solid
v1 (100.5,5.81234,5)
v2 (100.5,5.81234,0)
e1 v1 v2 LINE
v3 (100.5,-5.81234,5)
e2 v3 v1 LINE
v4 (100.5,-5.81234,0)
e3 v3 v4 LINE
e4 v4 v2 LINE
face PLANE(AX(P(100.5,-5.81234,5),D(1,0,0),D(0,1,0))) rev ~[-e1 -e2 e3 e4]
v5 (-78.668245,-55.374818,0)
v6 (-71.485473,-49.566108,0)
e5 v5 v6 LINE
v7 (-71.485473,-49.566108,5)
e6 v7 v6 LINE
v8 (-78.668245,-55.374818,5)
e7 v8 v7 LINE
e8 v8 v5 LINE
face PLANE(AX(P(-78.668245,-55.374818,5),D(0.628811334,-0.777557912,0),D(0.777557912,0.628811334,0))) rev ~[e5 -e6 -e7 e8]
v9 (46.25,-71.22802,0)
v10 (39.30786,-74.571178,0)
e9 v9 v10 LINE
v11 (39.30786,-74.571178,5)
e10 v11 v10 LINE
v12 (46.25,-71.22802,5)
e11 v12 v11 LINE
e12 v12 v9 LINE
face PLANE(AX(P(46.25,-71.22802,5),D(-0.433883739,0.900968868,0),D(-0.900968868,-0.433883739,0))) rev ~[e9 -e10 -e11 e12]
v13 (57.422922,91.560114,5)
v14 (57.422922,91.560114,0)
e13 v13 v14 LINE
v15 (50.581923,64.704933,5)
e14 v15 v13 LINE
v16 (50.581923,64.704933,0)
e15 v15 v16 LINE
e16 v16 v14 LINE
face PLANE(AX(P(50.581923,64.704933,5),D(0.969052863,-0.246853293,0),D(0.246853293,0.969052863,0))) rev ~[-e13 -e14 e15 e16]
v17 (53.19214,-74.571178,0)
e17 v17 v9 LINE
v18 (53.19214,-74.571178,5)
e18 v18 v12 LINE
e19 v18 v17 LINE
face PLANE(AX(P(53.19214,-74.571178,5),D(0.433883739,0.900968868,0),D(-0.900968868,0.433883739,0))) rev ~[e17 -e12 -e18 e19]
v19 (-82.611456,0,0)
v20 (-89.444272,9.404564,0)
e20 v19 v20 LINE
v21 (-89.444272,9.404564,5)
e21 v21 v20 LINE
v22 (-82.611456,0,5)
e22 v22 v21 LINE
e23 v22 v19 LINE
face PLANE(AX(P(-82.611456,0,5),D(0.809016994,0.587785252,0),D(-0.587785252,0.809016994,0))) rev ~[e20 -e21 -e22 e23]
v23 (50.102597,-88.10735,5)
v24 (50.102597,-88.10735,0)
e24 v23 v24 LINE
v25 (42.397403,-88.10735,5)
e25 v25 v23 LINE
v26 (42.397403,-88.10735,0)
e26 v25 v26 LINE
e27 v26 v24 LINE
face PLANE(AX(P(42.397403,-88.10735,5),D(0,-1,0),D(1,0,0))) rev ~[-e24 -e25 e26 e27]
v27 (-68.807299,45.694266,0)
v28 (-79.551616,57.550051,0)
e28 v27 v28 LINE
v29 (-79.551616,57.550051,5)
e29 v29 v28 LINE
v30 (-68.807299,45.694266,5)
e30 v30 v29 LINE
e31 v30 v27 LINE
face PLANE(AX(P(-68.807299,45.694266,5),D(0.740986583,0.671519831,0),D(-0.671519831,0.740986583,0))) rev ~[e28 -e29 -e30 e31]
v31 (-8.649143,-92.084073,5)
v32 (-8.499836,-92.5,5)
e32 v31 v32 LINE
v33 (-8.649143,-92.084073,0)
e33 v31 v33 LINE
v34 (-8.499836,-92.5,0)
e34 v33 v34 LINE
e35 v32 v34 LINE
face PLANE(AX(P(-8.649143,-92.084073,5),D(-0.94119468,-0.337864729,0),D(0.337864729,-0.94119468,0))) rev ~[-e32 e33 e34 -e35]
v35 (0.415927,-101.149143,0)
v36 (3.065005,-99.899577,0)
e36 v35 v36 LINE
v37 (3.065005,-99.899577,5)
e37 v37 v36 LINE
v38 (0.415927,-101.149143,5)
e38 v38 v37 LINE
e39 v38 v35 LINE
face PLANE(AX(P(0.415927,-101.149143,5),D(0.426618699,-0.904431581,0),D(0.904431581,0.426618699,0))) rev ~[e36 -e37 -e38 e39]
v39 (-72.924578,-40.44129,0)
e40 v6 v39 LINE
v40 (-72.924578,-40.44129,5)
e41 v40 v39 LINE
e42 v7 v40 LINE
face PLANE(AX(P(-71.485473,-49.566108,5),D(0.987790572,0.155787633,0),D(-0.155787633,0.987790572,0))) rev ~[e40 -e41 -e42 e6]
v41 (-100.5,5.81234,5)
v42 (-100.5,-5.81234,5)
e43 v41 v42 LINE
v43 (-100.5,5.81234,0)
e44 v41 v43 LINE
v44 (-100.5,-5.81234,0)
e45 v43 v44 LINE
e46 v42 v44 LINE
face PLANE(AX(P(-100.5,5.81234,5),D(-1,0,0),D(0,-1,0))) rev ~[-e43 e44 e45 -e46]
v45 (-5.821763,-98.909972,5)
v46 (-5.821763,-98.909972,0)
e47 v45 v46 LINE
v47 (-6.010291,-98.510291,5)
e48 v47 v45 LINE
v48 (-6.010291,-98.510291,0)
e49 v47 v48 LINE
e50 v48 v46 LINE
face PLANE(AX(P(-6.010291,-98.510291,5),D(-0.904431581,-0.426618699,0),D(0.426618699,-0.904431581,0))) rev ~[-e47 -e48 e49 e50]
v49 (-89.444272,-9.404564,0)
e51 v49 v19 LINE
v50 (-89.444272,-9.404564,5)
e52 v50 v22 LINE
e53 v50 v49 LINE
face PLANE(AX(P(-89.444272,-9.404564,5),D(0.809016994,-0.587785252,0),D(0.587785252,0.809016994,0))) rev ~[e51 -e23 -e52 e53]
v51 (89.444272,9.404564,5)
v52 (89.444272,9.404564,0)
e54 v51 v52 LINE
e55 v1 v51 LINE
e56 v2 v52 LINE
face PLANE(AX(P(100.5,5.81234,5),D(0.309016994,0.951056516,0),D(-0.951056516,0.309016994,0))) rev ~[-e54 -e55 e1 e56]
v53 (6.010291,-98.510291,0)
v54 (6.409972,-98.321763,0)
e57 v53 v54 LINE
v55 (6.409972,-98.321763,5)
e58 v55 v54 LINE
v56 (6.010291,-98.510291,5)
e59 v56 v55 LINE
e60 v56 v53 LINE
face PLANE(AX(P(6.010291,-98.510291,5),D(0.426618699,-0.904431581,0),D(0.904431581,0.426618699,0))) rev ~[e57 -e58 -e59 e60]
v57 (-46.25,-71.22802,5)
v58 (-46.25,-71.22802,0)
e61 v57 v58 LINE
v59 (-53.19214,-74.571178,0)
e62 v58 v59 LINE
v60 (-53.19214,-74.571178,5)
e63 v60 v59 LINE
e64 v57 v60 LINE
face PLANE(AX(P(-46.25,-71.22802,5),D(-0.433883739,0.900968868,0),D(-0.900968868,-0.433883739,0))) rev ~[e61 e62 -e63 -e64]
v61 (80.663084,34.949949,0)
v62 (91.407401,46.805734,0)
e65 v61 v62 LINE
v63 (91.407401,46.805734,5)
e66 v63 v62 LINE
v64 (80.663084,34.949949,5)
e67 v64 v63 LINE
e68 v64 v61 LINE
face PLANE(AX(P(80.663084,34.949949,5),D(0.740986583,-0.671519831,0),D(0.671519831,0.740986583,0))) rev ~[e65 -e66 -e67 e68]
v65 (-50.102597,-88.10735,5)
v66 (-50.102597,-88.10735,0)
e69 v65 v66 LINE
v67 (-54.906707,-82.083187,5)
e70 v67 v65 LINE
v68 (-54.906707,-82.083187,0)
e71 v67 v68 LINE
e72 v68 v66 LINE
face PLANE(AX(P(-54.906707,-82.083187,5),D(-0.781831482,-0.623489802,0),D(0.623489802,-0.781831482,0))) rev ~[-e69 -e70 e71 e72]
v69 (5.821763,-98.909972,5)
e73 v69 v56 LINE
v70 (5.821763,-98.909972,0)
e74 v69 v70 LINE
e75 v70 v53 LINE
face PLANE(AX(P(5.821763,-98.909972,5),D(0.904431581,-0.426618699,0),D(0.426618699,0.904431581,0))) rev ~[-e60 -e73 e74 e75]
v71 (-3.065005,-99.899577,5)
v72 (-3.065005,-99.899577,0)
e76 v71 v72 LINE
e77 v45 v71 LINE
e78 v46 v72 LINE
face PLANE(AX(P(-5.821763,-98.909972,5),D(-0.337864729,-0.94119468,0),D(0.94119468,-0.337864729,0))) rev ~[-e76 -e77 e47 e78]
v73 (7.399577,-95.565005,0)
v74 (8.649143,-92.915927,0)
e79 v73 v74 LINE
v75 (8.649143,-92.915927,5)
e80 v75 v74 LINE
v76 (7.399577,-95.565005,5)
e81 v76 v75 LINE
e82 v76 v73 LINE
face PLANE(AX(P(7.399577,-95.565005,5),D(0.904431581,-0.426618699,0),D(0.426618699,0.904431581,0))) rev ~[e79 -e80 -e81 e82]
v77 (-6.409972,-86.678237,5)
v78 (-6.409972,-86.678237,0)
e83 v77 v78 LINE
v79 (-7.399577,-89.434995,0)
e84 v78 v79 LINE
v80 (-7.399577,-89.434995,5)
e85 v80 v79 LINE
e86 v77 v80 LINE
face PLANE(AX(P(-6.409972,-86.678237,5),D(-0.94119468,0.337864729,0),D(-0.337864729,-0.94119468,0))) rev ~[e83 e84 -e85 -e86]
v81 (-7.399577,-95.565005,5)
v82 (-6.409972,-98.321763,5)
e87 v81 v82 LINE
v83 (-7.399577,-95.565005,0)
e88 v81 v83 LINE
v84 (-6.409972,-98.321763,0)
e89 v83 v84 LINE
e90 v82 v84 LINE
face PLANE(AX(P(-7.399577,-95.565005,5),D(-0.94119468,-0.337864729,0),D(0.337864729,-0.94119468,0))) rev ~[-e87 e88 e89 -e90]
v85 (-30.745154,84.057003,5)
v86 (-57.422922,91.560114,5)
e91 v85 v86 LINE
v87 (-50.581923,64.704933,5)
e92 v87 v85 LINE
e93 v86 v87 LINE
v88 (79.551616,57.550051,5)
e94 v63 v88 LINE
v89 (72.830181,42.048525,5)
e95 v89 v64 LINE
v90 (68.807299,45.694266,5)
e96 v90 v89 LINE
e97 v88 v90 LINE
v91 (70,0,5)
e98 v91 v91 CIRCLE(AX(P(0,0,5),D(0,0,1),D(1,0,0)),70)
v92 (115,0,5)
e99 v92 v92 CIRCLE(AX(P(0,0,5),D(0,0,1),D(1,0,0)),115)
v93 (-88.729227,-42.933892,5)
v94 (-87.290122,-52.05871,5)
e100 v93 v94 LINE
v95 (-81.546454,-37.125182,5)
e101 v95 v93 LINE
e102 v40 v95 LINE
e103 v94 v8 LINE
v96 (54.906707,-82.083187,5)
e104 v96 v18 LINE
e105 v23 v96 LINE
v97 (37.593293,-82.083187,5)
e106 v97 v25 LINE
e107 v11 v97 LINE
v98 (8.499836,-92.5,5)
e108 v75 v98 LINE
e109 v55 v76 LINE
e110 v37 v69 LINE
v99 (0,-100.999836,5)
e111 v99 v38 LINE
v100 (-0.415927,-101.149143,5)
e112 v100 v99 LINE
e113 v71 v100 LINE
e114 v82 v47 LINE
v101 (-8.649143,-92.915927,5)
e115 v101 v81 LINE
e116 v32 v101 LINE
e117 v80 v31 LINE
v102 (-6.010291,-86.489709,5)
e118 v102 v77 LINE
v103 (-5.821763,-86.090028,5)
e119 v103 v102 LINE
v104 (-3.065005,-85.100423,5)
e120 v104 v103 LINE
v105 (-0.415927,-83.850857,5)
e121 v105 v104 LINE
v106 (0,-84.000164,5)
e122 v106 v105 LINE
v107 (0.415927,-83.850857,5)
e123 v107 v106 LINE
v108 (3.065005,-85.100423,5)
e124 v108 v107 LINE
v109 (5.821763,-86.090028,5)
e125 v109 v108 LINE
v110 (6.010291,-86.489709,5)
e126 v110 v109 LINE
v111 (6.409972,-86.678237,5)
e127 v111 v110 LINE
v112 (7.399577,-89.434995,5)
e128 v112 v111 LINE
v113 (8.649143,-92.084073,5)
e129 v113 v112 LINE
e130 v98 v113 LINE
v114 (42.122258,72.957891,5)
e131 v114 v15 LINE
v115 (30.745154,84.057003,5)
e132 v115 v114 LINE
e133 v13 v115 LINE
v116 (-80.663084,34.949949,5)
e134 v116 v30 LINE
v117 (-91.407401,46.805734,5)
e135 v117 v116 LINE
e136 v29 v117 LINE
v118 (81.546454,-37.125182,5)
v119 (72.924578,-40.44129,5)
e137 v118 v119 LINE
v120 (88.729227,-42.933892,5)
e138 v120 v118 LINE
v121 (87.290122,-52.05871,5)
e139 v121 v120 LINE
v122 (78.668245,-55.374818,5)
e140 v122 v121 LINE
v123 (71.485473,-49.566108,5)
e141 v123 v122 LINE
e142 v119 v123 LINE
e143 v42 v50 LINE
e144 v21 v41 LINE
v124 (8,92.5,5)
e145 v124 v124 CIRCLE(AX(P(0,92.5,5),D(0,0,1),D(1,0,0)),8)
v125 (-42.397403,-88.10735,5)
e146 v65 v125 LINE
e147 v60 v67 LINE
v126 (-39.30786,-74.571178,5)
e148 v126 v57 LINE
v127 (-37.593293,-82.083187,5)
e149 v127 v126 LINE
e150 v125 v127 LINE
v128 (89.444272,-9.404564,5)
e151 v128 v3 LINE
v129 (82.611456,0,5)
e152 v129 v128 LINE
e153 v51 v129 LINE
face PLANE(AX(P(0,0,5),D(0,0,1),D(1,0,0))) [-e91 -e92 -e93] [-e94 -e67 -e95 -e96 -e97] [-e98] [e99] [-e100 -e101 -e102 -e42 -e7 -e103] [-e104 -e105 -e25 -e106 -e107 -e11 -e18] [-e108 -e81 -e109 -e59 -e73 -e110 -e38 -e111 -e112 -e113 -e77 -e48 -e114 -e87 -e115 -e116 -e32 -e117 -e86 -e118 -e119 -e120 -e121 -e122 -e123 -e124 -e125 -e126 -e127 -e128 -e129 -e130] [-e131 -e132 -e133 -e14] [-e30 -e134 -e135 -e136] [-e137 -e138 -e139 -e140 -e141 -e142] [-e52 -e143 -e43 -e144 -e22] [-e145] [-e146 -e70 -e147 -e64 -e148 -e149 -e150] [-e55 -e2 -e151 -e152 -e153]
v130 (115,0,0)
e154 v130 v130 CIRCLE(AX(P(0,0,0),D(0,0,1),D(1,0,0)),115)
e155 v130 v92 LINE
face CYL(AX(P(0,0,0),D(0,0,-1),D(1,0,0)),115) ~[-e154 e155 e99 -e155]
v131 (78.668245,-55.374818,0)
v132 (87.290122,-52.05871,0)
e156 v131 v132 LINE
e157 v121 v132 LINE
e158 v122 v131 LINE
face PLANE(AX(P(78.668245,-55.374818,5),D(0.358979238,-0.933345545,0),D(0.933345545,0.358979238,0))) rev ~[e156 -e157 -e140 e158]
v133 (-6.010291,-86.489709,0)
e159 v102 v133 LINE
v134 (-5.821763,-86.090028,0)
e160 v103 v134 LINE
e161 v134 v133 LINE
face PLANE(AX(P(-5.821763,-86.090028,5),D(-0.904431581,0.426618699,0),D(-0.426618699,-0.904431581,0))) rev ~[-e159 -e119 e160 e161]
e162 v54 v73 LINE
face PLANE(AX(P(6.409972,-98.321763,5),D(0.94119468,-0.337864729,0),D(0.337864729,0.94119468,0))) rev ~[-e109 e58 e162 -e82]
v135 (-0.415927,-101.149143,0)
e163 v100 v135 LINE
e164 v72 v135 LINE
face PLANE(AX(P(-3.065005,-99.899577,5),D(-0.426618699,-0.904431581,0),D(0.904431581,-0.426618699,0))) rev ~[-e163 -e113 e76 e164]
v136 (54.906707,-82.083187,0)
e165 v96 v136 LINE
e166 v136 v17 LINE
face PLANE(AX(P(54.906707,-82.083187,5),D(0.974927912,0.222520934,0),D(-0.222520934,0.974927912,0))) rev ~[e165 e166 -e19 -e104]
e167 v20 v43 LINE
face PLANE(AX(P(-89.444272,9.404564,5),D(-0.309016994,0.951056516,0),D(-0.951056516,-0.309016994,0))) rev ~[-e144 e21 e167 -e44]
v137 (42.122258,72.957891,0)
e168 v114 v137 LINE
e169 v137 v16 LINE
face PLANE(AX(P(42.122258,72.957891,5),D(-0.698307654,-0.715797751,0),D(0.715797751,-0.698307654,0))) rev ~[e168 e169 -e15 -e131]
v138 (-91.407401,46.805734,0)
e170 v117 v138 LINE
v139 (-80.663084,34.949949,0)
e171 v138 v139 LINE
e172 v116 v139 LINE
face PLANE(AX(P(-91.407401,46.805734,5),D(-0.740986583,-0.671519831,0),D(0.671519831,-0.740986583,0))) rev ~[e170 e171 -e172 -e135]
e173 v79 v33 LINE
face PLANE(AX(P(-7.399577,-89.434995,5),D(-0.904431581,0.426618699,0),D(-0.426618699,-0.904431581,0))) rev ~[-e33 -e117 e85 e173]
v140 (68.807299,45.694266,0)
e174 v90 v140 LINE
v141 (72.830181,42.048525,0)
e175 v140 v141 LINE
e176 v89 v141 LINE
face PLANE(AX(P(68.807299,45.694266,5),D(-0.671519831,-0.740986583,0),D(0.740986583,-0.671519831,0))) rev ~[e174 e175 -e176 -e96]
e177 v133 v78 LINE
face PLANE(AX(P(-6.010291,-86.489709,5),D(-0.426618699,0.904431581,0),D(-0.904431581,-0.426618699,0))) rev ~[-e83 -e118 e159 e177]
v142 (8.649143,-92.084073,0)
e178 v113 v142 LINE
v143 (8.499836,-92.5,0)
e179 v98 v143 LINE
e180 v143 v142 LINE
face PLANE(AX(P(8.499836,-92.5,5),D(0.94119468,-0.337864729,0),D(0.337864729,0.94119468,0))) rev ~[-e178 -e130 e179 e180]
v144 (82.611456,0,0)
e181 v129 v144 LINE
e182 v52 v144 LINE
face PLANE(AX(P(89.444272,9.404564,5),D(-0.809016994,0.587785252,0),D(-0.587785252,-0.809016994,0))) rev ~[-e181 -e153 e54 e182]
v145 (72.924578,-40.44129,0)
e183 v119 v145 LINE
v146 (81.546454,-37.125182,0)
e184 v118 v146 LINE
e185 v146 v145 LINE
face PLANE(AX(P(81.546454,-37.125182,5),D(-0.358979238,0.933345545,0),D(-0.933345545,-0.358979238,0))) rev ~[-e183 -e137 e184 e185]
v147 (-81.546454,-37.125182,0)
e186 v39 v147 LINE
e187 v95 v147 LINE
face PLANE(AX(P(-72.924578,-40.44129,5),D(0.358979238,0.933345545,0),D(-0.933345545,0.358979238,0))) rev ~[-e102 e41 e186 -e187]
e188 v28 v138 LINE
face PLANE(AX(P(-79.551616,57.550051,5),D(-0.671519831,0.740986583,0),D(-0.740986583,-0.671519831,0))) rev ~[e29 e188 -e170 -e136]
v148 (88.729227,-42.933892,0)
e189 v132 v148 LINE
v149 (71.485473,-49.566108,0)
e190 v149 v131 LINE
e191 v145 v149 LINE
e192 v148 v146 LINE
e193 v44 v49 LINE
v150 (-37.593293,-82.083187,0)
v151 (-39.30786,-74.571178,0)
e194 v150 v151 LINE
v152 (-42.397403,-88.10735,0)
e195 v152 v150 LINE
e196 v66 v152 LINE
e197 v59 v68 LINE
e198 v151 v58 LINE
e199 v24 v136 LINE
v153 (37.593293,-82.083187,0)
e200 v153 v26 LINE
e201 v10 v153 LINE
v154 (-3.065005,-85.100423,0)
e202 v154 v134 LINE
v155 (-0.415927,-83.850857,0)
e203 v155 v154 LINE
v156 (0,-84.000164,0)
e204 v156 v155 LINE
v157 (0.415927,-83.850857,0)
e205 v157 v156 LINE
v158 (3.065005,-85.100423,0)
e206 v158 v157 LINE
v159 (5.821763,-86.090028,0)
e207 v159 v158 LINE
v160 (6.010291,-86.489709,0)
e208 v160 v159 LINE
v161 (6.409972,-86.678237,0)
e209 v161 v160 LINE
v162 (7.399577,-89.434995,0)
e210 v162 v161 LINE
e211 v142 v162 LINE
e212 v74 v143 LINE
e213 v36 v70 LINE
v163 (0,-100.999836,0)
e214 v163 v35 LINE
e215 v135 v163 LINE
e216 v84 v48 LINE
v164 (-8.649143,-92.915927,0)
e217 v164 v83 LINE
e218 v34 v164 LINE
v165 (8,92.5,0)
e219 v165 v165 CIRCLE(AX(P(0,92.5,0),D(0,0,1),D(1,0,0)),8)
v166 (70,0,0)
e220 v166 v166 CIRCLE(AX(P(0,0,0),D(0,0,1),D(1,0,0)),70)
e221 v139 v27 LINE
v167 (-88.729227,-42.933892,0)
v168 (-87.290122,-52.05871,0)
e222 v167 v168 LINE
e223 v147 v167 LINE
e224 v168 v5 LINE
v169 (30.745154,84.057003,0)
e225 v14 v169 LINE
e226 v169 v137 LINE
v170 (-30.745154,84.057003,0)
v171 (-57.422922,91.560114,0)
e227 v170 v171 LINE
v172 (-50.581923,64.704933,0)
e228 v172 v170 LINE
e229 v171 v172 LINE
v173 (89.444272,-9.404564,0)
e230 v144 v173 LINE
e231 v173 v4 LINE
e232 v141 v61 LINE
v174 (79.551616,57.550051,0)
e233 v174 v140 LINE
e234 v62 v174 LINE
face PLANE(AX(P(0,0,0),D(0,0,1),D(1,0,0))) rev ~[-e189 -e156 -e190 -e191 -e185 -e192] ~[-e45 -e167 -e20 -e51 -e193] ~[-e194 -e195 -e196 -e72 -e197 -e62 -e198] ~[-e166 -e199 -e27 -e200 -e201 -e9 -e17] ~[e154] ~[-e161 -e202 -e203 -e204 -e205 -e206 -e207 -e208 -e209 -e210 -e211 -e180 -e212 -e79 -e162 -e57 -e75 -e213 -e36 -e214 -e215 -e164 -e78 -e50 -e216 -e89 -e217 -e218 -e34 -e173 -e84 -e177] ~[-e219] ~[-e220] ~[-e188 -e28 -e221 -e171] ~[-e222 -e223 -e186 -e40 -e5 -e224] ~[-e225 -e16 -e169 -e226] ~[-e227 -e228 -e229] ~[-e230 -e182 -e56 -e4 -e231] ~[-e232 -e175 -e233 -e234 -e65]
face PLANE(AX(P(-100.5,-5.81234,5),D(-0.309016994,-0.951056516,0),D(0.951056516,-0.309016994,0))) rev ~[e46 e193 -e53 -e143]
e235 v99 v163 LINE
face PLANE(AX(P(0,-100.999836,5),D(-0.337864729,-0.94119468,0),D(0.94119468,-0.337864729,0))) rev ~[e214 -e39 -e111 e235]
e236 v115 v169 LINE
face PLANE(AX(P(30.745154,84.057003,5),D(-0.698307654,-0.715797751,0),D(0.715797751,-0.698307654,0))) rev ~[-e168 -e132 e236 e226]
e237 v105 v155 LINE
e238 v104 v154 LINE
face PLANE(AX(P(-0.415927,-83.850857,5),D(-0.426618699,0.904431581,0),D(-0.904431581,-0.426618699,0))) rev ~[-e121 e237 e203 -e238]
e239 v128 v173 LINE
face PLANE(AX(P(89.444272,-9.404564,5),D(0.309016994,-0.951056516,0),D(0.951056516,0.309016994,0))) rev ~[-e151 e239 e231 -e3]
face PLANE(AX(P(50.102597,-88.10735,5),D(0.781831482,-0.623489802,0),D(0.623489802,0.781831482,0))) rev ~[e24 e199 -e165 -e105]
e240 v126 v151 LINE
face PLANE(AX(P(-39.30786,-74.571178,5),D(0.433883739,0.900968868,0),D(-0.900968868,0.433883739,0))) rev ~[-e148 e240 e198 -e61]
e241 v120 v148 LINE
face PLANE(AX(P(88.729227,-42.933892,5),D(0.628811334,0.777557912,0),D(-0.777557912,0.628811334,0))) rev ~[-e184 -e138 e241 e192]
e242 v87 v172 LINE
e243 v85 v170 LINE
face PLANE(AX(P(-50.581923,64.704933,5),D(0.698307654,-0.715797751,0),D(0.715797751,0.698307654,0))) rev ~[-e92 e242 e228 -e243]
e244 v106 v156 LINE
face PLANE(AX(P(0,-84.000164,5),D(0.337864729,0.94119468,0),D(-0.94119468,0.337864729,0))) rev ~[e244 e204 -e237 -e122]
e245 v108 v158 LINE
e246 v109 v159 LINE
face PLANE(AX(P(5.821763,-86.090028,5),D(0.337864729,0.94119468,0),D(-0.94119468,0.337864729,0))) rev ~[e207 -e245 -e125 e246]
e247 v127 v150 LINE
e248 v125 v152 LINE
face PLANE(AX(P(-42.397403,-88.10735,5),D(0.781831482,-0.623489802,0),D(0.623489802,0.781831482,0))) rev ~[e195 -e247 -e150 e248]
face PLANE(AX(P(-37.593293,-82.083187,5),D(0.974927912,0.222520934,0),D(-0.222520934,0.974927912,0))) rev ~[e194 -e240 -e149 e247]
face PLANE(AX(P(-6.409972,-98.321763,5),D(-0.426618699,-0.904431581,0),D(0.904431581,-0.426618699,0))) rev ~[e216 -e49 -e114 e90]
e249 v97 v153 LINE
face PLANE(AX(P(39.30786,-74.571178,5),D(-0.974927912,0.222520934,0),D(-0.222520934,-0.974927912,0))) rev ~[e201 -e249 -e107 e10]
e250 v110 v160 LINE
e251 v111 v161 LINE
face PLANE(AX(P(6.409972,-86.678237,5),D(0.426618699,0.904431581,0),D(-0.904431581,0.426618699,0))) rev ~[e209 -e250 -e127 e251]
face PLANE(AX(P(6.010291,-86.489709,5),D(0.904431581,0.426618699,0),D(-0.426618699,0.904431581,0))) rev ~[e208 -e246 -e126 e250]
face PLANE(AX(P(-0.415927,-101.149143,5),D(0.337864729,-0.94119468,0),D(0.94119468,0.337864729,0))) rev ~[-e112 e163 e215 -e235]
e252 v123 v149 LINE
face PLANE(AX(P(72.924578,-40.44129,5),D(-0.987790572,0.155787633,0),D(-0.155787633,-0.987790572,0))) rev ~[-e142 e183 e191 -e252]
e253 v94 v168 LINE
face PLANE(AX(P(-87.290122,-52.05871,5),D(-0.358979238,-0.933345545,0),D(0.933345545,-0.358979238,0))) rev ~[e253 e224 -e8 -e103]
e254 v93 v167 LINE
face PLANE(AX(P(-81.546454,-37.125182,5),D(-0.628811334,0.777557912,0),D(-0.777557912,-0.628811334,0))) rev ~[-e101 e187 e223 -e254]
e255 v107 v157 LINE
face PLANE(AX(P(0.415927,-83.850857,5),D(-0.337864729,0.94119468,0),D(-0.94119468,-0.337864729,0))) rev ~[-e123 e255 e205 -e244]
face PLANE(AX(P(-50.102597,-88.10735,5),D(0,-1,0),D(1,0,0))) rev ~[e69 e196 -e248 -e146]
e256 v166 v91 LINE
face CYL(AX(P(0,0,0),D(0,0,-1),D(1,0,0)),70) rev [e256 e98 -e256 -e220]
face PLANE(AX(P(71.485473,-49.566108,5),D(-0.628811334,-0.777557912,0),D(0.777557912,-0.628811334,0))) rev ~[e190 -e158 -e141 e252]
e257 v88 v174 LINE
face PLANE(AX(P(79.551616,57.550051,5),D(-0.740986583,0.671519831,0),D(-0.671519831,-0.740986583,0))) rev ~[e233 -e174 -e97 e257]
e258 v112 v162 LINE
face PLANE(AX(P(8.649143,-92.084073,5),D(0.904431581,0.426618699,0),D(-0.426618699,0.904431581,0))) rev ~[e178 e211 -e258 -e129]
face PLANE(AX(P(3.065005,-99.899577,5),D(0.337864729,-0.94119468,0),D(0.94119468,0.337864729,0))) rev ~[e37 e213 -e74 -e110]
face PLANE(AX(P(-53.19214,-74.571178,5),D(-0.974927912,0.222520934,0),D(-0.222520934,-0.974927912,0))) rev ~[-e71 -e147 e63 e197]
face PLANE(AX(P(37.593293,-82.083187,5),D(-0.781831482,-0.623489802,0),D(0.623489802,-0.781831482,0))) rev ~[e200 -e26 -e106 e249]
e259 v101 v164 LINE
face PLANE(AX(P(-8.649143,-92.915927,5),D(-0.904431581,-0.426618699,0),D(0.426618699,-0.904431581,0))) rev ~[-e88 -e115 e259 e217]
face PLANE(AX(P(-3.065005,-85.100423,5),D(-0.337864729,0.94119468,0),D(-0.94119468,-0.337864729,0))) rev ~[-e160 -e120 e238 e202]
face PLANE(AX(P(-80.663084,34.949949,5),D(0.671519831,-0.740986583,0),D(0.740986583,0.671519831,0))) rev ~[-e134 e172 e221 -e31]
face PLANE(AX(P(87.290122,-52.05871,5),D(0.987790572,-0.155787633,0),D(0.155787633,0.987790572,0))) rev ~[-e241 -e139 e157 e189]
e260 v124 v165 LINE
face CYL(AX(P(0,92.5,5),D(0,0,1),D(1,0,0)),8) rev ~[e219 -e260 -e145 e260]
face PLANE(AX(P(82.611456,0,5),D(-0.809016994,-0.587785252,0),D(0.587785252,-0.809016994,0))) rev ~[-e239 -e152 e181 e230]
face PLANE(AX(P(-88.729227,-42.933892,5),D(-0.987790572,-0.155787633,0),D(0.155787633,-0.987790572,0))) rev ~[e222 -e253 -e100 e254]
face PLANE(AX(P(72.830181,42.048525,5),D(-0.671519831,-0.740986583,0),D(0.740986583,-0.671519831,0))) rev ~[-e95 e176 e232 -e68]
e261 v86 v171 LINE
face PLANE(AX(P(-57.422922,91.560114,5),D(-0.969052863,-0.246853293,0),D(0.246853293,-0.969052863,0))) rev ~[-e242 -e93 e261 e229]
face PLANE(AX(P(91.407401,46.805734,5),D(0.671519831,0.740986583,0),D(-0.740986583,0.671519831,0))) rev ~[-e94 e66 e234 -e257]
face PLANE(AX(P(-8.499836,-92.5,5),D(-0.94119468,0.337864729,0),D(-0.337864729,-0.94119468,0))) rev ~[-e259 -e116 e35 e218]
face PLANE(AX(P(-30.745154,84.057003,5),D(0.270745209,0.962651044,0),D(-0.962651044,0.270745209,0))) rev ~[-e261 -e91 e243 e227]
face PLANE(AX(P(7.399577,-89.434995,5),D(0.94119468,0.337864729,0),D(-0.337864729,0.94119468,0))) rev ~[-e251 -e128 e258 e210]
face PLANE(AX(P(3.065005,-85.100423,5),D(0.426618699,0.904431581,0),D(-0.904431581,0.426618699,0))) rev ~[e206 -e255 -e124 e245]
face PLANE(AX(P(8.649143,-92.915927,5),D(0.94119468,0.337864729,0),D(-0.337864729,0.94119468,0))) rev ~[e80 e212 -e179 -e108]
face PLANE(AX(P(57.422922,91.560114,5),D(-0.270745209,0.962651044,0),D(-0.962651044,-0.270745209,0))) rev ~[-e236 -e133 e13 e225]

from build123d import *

# Parameters (mm, degrees)
F0_R     = 115
F0_R_2   = 70
F1_DEPTH = 5
F2_R     = 8
F3_DEPTH = 25


with BuildPart() as f1:
    # F0 (on Top) → F1 (new body)
    with BuildSketch(Plane.XY):
        Circle(F0_R)
        Circle(F0_R_2, mode=Mode.SUBTRACT)
    extrude(amount=F1_DEPTH)

    # F2 (on face) → F3 (cut)
    with BuildSketch(Plane.XY.offset(5)):
        with Locations((0, 92.5)):
            Circle(F2_R)
        Polygon((30.7451541874, 84.0570025344), (42.1222582105, 72.9578913502), (50.5819233456, 64.7049331524), (57.422922467, 91.5601138634), align=None)
        Polygon((68.8072985361, 45.6942659799), (72.8301810847, 42.0485246544), (80.6630838702, 34.949948686), (91.4074011641, 46.8057340201), (79.55161583, 57.550051314), align=None)
        Polygon((100.5, -5.812340224), (100.5, 5.812340224), (89.44427191, 9.4045640367), (82.61145618, 0), (89.44427191, -9.4045640367), align=None)
        Polygon((78.6682453406, -55.374818439), (87.2901221684, -52.0587102834), (88.7292266779, -42.9338918444), (81.5464543596, -37.125181561), (72.9245775317, -40.4412897166), (71.4854730222, -49.5661081556), align=None)
        Polygon((42.3974030495, -88.1073498501), (50.1025969505, -88.1073498501), (54.906706769, -82.0831866798), (53.1921398259, -74.571178077), (46.25, -71.2280197367), (39.3078601741, -74.571178077), (37.593293231, -82.0831866798), align=None)
        Polygon((3.065005288, -99.899577335), (5.8217626423, -98.9099722116), (6.010291359, -98.510291359), align=None)
        Polygon((0.4159269752, -101.1491426608), (3.065005288, -99.899577335), (0, -100.9998355537), align=None)
        Polygon((0, -100.9998355537), (3.065005288, -99.899577335), (6.010291359, -98.510291359), (7.399577335, -95.565005288), (8.4998355537, -92.5), (7.399577335, -89.434994712), (6.010291359, -86.489708641), (3.065005288, -85.100422665), (0, -84.0001644463), (-3.065005288, -85.100422665), (-6.010291359, -86.489708641), (-7.399577335, -89.434994712), (-8.4998355537, -92.5), (-7.399577335, -95.565005288), (-6.010291359, -98.510291359), (-3.065005288, -99.899577335), align=None)
        Polygon((7.399577335, -95.565005288), (6.010291359, -98.510291359), (6.4099722116, -98.3217626423), align=None)
        Polygon((-0.4159269752, -101.1491426608), (0, -100.9998355537), (-3.065005288, -99.899577335), align=None)
        Polygon((8.4998355537, -92.5), (7.399577335, -95.565005288), (8.6491426608, -92.9159269752), align=None)
        Polygon((-5.8217626423, -98.9099722116), (-3.065005288, -99.899577335), (-6.010291359, -98.510291359), align=None)
        Polygon((7.399577335, -89.434994712), (8.4998355537, -92.5), (8.6491426608, -92.0840730248), align=None)
        Polygon((-6.4099722116, -98.3217626423), (-6.010291359, -98.510291359), (-7.399577335, -95.565005288), align=None)
        Polygon((6.010291359, -86.489708641), (7.399577335, -89.434994712), (6.4099722116, -86.6782373577), align=None)
        Polygon((-8.6491426608, -92.9159269752), (-7.399577335, -95.565005288), (-8.4998355537, -92.5), align=None)
        Polygon((3.065005288, -85.100422665), (6.010291359, -86.489708641), (5.8217626423, -86.0900277884), align=None)
        Polygon((-8.6491426608, -92.0840730248), (-8.4998355537, -92.5), (-7.399577335, -89.434994712), align=None)
        Polygon((0, -84.0001644463), (3.065005288, -85.100422665), (0.4159269752, -83.8508573392), align=None)
        Polygon((-6.4099722116, -86.6782373577), (-7.399577335, -89.434994712), (-6.010291359, -86.489708641), align=None)
        Polygon((-3.065005288, -85.100422665), (0, -84.0001644463), (-0.4159269752, -83.8508573392), align=None)
        Polygon((-5.8217626423, -86.0900277884), (-6.010291359, -86.489708641), (-3.065005288, -85.100422665), align=None)
        Polygon((-57.422922467, 91.5601138634), (-50.5819233456, 64.7049331524), (-30.7451541874, 84.0570025344), align=None)
        Polygon((-80.6630838702, 34.949948686), (-68.8072985361, 45.6942659799), (-79.55161583, 57.550051314), (-91.4074011641, 46.8057340201), align=None)
        Polygon((-100.5, -5.812340224), (-89.44427191, -9.4045640367), (-82.61145618, 0), (-89.44427191, 9.4045640367), (-100.5, 5.812340224), align=None)
        Polygon((-71.4854730222, -49.5661081556), (-72.9245775317, -40.4412897166), (-81.5464543596, -37.125181561), (-88.7292266779, -42.9338918444), (-87.2901221684, -52.0587102834), (-78.6682453406, -55.374818439), align=None)
        Polygon((-50.1025969505, -88.1073498501), (-42.3974030495, -88.1073498501), (-37.593293231, -82.0831866798), (-39.3078601741, -74.571178077), (-46.25, -71.2280197367), (-53.1921398259, -74.571178077), (-54.906706769, -82.0831866798), align=None)
    extrude(amount=-F3_DEPTH, mode=Mode.SUBTRACT)


solid = f1.part
